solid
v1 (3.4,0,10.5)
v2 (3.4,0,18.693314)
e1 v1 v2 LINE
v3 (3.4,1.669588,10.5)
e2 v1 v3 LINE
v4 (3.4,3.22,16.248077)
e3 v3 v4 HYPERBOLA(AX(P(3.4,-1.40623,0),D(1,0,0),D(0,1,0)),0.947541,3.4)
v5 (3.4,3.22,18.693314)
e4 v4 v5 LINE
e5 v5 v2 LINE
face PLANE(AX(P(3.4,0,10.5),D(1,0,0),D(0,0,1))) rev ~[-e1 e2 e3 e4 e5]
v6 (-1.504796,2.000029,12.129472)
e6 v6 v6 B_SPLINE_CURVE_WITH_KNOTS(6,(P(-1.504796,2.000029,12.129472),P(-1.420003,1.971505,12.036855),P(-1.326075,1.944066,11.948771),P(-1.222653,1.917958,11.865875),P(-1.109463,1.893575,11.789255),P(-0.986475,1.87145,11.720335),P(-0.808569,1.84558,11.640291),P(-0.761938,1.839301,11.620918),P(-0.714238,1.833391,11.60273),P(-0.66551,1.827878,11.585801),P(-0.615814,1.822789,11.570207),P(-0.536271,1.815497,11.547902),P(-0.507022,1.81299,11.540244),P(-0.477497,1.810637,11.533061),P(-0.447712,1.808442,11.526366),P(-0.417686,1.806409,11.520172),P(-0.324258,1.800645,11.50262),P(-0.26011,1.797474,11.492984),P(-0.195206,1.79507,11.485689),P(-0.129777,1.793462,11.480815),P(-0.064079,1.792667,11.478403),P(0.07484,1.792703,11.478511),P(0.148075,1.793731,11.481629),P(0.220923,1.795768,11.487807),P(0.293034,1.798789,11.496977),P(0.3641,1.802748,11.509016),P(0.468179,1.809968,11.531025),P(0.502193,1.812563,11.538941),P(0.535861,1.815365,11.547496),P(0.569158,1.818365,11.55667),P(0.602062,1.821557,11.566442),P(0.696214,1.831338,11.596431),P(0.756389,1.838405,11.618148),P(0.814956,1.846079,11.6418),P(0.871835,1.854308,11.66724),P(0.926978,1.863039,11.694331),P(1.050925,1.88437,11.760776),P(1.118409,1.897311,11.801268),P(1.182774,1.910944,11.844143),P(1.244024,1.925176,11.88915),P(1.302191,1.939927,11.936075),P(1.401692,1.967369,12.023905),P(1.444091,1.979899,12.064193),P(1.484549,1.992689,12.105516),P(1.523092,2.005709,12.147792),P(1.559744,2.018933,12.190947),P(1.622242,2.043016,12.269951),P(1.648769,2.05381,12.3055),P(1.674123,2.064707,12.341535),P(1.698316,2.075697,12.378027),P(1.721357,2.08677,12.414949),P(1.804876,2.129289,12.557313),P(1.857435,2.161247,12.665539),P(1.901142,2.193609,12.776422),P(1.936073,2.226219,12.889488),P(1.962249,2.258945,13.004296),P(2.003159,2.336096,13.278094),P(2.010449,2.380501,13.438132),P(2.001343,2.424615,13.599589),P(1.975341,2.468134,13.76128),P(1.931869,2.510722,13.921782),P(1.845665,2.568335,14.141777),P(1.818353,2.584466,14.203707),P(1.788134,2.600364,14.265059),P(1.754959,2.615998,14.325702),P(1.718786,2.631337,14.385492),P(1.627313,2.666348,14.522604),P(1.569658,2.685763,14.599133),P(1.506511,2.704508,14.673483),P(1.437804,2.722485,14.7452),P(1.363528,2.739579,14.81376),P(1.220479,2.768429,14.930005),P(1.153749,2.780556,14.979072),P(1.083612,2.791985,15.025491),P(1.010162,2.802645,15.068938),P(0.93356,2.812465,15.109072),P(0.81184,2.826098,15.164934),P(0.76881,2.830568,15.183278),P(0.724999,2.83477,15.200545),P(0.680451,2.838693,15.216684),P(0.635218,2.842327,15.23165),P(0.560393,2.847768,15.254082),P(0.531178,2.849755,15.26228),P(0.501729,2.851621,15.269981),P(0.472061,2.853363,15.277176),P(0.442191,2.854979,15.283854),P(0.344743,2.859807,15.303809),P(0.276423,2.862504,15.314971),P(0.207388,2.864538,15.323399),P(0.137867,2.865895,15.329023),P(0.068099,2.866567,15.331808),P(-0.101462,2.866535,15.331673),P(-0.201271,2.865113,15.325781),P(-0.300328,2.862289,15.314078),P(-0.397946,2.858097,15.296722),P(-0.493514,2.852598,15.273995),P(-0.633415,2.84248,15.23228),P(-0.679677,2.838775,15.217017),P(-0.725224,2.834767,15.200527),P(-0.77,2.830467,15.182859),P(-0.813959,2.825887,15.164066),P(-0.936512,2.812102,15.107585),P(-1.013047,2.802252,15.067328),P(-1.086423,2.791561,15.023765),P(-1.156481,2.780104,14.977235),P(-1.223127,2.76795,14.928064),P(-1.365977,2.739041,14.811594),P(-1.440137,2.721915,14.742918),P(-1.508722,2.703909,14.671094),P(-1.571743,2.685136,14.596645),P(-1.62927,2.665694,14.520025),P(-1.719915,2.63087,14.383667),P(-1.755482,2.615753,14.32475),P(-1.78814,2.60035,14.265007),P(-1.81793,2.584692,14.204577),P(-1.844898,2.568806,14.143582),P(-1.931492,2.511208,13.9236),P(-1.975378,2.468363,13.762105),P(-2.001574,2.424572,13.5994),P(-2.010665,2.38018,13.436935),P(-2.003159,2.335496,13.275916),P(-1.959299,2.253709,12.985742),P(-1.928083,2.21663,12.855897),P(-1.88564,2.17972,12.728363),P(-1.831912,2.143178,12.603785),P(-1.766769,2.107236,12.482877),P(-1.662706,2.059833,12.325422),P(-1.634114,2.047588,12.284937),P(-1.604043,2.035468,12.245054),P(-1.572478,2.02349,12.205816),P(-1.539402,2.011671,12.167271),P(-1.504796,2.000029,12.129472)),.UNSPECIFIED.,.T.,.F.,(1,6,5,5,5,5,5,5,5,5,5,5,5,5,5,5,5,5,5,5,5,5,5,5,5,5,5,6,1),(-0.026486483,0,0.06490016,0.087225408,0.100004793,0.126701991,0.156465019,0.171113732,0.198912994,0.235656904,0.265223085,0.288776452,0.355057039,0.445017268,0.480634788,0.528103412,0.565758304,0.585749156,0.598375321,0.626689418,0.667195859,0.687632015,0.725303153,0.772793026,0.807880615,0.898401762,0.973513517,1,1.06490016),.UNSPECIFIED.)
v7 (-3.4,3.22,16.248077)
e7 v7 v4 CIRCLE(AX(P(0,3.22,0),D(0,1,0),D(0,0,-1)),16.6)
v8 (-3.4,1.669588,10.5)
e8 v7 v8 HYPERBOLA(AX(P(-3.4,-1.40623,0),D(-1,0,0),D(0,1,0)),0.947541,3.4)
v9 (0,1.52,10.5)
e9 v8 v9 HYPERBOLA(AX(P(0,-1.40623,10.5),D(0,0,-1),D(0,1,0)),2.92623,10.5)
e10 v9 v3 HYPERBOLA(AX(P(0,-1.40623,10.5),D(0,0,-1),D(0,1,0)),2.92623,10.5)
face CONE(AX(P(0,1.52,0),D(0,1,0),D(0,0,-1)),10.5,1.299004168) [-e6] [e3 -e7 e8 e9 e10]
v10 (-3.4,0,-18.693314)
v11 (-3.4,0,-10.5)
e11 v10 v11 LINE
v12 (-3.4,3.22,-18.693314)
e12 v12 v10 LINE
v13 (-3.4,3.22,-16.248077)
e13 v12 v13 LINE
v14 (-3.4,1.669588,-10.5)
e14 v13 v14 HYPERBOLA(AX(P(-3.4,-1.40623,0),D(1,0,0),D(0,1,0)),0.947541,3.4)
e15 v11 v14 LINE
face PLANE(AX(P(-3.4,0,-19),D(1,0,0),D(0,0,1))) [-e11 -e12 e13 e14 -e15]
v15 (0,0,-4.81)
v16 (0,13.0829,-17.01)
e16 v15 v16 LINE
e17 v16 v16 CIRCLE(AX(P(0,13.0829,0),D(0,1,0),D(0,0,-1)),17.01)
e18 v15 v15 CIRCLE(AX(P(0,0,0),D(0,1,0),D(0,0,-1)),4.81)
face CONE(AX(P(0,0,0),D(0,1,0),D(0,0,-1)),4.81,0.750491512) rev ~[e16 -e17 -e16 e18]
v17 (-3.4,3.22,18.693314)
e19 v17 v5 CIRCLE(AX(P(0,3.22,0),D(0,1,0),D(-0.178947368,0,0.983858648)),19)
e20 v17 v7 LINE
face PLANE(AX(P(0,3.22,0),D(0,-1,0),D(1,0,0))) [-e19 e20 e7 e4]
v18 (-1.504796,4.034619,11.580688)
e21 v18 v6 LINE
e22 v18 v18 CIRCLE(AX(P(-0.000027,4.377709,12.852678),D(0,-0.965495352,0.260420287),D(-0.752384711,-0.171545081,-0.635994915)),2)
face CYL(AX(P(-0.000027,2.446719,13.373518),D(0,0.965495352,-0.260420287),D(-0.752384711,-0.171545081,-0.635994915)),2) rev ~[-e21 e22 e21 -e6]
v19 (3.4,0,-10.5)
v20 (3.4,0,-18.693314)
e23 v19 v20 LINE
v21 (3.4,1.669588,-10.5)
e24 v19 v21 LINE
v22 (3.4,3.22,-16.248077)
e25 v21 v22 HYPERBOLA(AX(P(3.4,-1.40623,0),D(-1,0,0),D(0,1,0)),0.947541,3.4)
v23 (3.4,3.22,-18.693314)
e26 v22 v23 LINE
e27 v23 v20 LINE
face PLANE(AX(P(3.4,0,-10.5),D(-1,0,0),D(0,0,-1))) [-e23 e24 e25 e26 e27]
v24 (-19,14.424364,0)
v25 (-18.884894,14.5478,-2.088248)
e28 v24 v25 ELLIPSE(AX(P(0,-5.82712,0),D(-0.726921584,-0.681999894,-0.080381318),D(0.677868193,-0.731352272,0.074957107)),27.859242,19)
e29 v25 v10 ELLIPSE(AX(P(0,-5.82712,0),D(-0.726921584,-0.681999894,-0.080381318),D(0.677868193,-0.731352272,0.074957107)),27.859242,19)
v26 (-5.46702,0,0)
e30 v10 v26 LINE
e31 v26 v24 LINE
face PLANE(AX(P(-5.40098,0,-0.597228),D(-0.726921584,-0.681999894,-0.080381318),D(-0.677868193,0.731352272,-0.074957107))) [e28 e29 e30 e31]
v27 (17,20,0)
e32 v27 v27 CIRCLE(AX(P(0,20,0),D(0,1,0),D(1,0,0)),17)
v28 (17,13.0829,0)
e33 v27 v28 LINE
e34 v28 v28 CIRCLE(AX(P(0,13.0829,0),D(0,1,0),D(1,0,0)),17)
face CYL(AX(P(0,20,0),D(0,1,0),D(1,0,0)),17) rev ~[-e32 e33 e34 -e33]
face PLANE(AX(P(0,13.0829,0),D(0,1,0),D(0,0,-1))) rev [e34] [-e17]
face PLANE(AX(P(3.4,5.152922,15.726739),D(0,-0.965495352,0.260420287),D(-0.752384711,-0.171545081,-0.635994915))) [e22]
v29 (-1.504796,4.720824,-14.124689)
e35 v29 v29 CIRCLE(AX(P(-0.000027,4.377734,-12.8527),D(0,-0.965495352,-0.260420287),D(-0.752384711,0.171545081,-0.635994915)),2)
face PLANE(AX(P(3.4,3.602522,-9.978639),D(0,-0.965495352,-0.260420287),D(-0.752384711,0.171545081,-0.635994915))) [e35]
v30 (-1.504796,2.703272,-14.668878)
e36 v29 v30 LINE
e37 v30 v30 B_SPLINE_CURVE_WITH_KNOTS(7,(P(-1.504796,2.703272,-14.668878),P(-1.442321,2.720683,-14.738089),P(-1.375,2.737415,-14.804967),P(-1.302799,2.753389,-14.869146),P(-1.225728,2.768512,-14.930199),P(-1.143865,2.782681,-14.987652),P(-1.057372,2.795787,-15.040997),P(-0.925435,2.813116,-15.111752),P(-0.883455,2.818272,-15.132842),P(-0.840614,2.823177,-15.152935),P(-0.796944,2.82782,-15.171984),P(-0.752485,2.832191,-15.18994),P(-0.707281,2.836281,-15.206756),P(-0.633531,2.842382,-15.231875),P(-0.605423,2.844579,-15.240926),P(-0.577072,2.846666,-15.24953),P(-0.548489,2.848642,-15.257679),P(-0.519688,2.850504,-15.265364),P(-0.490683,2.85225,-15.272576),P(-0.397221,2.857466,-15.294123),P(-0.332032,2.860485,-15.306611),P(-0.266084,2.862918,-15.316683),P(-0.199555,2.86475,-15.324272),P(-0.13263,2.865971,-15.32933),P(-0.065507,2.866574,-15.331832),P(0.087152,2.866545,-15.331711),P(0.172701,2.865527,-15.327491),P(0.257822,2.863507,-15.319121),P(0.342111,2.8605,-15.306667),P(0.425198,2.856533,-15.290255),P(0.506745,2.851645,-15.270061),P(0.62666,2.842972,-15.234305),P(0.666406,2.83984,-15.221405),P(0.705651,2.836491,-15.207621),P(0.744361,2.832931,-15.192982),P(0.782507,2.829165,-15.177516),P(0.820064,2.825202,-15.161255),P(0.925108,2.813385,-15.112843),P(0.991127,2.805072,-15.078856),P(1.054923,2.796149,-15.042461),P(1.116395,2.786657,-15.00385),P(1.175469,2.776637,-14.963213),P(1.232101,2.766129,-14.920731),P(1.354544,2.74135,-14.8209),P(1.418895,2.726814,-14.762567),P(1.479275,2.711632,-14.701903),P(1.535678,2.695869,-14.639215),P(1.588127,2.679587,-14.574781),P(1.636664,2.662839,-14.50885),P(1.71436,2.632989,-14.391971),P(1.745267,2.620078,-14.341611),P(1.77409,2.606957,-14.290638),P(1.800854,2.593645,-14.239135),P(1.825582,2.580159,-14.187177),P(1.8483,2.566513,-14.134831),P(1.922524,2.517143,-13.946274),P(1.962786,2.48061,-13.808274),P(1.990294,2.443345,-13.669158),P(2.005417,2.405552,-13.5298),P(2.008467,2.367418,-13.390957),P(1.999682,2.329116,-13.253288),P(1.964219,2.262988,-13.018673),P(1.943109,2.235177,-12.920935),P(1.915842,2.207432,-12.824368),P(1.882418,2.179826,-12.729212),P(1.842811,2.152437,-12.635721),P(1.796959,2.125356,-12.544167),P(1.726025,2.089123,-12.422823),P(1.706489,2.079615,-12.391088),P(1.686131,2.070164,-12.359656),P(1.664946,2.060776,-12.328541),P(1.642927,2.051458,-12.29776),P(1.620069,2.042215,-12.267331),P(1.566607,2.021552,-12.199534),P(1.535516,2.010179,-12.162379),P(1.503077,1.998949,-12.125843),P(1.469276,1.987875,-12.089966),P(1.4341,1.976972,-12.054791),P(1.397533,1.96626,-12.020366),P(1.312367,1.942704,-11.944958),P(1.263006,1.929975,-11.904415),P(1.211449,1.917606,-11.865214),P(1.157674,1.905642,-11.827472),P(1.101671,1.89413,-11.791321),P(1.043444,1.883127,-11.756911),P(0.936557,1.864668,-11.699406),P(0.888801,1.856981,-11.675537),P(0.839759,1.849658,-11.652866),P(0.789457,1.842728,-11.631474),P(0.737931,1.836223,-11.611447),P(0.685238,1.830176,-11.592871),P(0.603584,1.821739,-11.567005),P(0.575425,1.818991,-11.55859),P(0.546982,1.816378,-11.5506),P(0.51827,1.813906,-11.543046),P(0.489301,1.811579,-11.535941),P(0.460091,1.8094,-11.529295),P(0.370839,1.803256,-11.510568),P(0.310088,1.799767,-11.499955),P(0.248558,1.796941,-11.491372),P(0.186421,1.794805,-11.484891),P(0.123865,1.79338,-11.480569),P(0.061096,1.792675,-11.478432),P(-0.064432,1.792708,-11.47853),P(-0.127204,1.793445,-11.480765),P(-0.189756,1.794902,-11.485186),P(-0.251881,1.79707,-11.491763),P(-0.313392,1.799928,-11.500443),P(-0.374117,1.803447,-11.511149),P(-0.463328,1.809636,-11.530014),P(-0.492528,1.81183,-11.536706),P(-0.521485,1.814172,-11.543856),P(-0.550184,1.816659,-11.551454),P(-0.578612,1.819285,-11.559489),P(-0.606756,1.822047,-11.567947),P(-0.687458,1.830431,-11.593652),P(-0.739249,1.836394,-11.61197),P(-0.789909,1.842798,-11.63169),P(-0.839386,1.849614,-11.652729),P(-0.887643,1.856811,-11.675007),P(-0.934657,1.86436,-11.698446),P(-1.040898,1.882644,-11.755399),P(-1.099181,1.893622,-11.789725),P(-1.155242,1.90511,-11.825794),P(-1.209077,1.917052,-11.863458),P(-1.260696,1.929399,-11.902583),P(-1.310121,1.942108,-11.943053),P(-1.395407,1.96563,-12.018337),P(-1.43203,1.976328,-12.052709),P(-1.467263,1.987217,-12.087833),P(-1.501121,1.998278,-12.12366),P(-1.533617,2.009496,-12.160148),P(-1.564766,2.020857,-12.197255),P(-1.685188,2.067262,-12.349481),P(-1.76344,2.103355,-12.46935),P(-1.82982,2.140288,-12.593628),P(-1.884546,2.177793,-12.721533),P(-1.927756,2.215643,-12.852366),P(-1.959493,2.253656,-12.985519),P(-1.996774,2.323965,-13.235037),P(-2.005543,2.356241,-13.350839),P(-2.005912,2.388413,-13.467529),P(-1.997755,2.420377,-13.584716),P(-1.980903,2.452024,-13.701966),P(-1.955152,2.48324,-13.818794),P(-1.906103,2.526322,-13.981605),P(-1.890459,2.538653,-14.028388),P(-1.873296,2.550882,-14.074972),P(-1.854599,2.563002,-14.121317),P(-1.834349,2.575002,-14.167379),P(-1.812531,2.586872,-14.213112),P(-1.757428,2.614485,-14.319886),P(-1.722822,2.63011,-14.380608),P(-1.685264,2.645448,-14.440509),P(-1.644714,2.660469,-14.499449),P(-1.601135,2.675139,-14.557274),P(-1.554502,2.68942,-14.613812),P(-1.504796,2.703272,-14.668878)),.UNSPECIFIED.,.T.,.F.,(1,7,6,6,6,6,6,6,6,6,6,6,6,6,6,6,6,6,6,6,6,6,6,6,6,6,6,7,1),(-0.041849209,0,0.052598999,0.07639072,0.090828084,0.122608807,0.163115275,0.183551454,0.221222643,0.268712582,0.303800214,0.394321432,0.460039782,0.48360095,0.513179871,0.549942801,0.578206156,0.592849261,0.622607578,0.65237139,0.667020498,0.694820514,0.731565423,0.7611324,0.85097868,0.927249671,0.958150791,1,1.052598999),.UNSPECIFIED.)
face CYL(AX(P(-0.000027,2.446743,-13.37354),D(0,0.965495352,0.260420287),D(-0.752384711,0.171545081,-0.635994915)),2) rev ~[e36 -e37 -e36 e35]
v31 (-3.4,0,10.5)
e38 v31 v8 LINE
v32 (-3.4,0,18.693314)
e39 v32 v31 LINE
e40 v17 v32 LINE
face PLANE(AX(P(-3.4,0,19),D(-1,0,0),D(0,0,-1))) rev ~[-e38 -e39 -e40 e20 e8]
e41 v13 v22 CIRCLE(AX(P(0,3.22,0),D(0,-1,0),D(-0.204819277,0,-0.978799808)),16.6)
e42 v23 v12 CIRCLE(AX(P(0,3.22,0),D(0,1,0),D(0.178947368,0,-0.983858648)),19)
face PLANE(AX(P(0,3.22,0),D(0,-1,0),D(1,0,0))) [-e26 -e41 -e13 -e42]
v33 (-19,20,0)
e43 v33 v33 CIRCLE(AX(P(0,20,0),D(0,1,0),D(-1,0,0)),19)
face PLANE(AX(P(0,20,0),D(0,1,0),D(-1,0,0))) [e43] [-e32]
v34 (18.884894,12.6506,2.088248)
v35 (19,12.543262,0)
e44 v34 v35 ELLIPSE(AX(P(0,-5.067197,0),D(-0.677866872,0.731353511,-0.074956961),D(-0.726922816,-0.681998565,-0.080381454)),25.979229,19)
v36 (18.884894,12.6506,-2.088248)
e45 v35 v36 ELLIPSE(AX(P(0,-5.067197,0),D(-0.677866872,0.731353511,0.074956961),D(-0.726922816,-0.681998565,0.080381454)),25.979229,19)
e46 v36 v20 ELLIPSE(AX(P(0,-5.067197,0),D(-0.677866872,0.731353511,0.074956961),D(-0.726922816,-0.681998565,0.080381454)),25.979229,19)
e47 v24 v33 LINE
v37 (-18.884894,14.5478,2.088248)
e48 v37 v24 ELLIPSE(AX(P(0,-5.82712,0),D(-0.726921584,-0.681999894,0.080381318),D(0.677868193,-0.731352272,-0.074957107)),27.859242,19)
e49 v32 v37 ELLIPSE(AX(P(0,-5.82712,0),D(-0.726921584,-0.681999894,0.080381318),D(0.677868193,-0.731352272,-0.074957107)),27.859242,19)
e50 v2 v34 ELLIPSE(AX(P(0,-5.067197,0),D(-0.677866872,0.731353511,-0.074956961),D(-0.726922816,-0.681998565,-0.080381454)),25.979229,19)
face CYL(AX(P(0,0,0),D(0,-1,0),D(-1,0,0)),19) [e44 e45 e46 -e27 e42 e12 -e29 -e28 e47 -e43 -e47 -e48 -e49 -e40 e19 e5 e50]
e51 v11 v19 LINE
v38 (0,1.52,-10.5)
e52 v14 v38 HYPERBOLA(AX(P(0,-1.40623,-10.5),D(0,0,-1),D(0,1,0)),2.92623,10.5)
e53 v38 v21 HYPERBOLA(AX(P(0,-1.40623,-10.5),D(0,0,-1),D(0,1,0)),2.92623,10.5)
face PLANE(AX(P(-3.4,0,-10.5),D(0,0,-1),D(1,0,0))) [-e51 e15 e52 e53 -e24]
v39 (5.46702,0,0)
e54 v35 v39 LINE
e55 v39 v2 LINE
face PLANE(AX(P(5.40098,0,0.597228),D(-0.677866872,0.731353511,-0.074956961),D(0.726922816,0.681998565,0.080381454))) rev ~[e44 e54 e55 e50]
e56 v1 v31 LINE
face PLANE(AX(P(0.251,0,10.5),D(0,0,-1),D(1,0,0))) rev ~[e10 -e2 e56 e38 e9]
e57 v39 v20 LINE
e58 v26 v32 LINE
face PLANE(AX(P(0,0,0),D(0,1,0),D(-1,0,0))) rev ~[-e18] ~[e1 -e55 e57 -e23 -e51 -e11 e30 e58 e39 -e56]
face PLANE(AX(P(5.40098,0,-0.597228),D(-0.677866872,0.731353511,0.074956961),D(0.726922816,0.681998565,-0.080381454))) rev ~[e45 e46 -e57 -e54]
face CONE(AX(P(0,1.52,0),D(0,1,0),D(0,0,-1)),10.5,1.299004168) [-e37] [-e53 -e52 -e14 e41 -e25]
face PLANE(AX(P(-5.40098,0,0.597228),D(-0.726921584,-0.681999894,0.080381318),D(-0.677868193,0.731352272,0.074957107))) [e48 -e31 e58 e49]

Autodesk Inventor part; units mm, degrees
ref_plane "YZ Plane" through (0, 0, 0) normal (1, 0, 0) x (0, 1, 0)
sketch "Sketch1" plane through (0, 0, 0) normal (0, 1, 0) x (-1, 0, 0)
  circle A0 centre (0, 0) radius 19
  dimension "d0" = 38
extrude "Extrusion1" add sketch "Sketch1" along normal blind 20
sketch "Sketch2" plane through (0, 0, 0) normal (0, -1, 0) x (1, 0, 0)
  line L0 (0, -10.5) -> (3.4, -10.5)
  line L1 (3.4, -10.5) -> (3.4, -19)
  line L2 (3.4, -19) -> (0, -19)
  line L3 (0, -19) -> (-3.4, -19)
  line L4 (-3.4, -19) -> (-3.4, -10.5)
  line L5 (-3.4, -10.5) -> (0, -10.5)
  point P0 (0, 0)
  dimension "d3" = 10.5
  dimension "d5" = 8.5
  dimension "d113" = 3.4
  dimension "d114" = 3.4
sketch "Sketch3" plane through (0, 0, 0) normal (0, -1, 0) x (1, 0, 0)
  line L0 (0.251, 10.5) -> (3.4, 10.5)
  line L1 (3.4, 10.5) -> (3.4, 19)
  line L2 (3.4, 19) -> (-0.351, 19)
  line L3 (-0.351, 19) -> (-3.4, 19)
  line L4 (-3.4, 19) -> (-3.4, 10.5)
  line L5 (-3.4, 10.5) -> (0.251, 10.5)
  point P0 (0, 0)
  dimension "d22" = 8.5
  dimension "d106" = 10.5
  dimension "d107" = 3.4
  dimension "d110" = 3.4
extrude "Extrusion2" cut sketch "Sketch3" against normal blind 3.22
extrude "Extrusion3" cut sketch "Sketch2" against normal blind 3.22
sketch "Sketch4" plane through (0, 0, 0) normal (1, 0, 0) x (0, 1, 0)
  line L0 (0, -10.5) -> (3.22, -10.5) projected
  line L1 (3.22, -10.5) -> (3.22, -16.6)
  line L2 (3.22, -10.5) -> (3.22, -18.6933) projected
  line L3 (3.22, -16.6) -> (3.22, -10.5)
  line L4 (3.22, -10.5) -> (1.52, -10.5)
  line L5 (1.52, -10.5) -> (3.22, -16.6)
  line L6 (-0.644, 0) -> (3.864, 0) projected
  point P0 (0, 0)
  dimension "d28" = 6.1
  dimension "d29" = 1.7
revolve "Revolution1" add sketch "Sketch4" angle 360 about axis through (0, -10, 0) along (0, 1, 0)
sketch "Sketch5" plane through (0, 20, 0) normal (0, 1, 0) x (1, 0, 0)
  circle A0 centre (0, 0) radius 4.81
  dimension "d31" = 9.62
extrude "Extrusion4" cut sketch "Sketch5" against normal through all
sketch "Sketch6" plane through (0, 0, 0) normal (1, 0, 0) x (0, 1, 0)
  line L0 (0, -4.81) -> (13.0829, -17.01)
  line L1 (20, -19) -> (20, 19) projected
  line L2 (13.0829, -4.81) -> (0, -4.81)
  line L3 (-2.6166, 0) -> (15.6995, 0) projected
  line L4 (13.0829, -4.81) -> (13.0829, -17.01)
  line L5 (3.22, -19) -> (20, -19) projected
  line L6 (0, -4.81) -> (13.0829, -4.81) construction
  point P0 (0, 0)
  point P1 (20, -4.81)
  point P2 (13.0829, -17.01)
  dimension "d85" = 12.2
  dimension "d90" = 13.0829
revolve "Revolution2" cut sketch "Sketch6" angle 360 about axis through (0, -10, 0) along (0, 1, 0)
ref_plane "Work Plane1" through (3.4, 3.22, 16.2481) normal (0, -0.9654954, 0.2604203) x (-0.7523847, -0.1715451, -0.6359949)
sketch "Sketch10" plane through (3.4, 3.22, 16.2481) normal (0, -0.9654954, 0.2604203) x (-0.7523847, -0.1715451, -0.6359949)
  line L0 (9.3243, 0.3271) -> (9.0379, 0) projected
  line L1 (-1.5552, -1.7763) -> (0, 0) projected
  line L2 (9.0379, 0) -> (0, 0)
  circle A0 centre (4.519, 0) radius 2
  point P0 (13.4442, 10.1942)
  dimension "d111" = 4
extrude "Extrusion5" cut sketch "Sketch10" along normal mid plane 4
ref_plane "Work Plane4" through (3.4, 1.6696, -10.5) normal (0, -0.9654954, -0.2604203) x (-0.7523847, 0.1715451, -0.6359949)
sketch "Sketch12" plane through (3.4, 1.6696, -10.5) normal (0, -0.9654954, -0.2604203) x (-0.7523847, 0.1715451, -0.6359949)
  line L0 (-0.2864, -0.3271) -> (0, 0) projected
  ellipse E0 centre (-3.8539, -9.5633) end of major axis (8.6357, -20.4981) minor radius 16.0272 (9.0379, 0) -> (3.9217, 4.4793) ccw projected
  line L1 (0, 0) -> (3.9217, 4.4793)
  line L2 (4.8298, -4.8065) -> (5.1162, -4.4793) projected
  line L3 (5.1162, -4.4793) -> (3.9217, 4.4793)
  line L4 (10.5931, 1.7763) -> (9.0379, 0) projected
  line L5 (9.0379, 0) -> (0, 0)
  circle A0 centre (4.519, 0) radius 2
  point P0 (-4.4062, -10.1942)
  point P1 (4.519, 0)
  dimension "d116" = 4
extrude "Extrusion6" cut sketch "Sketch12" along normal mid plane 4 contours A0 L3 L5 | L5 L3 A0 | L3 L5 A0 | L3 A0 L5
sketch "Sketch18" plane through (0, 0, 0) normal (0.1099078, 0, 0.9939418) x (0.9939418, 0, -0.1099078)
  line L0 (19, 20) -> (-19, 20) projected
  line L1 (19, 0) -> (5.4339, 0)
  line L2 (4.5334, 0) -> (5.4339, 0) projected
  line L3 (5.4339, 0) -> (19, 12.6506)
  line L4 (19, 0) -> (19, 20) projected
  line L5 (5.4339, 0) -> (23.9832, 0) construction
  line L6 (1.3249, 0) -> (19, 0) projected
  line L7 (19, 12.6506) -> (19, 0)
  line L8 (19, 0) -> (19, 20) projected
  line L9 (19, 0) -> (5.4339, 0)
  point P0 (0, 0)
  point P1 (24.4257, 20)
  dimension "d91" = 43
sketch "Sketch20" plane through (0, 0, 0) normal (-0.1099078, 0, 0.9939418) x (0.9939418, 0, 0.1099078)
  line L0 (5.4339, 3.22) -> (5.4339, 0) projected
  line L1 (5.4339, 0) -> (19, 12.6506)
  line L2 (19, 0) -> (19, 20) projected
  line L3 (5.4339, 0) -> (23.9832, 0) construction
  line L4 (1.3249, 0) -> (19, 0) projected
  line L5 (19, 12.6506) -> (19, 0)
  line L6 (5.4339, 0) -> (4.5334, 0) projected
  line L7 (19, 0) -> (5.4339, 0)
  point P0 (0, 0)
  point P1 (10.438, 5)
  point P2 (-18.8849, 20)
  point P3 (-18.8849, 20)
  dimension "d94" = 43
sketch "Sketch21" plane through (0, 0, 0) normal (-0.1099078, 0, 0.9939418) x (0.9939418, 0, 0.1099078)
  point P0 (0, 0)
sketch "Sketch22" plane through (0, 0, 0) normal (-0.1099078, 0, 0.9939418) x (0.9939418, 0, 0.1099078)
  line L0 (-18.8849, 20) -> (-19, 20) projected
  line L1 (-5.4339, 0) -> (21.9126, 0) construction
  line L2 (-5.4339, 0) -> (-4.5334, 0) projected
  line L3 (-5.4339, 0) -> (-19, 14.5478)
  line L4 (-19, 0) -> (-19, 20) projected
  line L5 (-5.4339, 0) -> (14.4577, 0) construction
  line L6 (-19, 0) -> (-1.3249, 0) projected
  line L7 (-19, 14.5478) -> (-19, 0)
  line L8 (-19, 0) -> (-5.4339, 0)
  point P0 (0, 0)
  dimension "d97" = 133
sketch "Sketch23" plane through (0, 0, 0) normal (0.1099078, 0, 0.9939418) x (0.9939418, 0, -0.1099078)
  line L0 (-9.5907, 0) -> (-1.3249, 0) projected
  line L1 (-5.6359, 0) -> (1.2007, 0) construction
  line L2 (-4.5334, 0) -> (-5.4339, 0) projected
  line L3 (-5.4339, 0) -> (-19, 14.5478)
  line L4 (-19, 0) -> (-19, 20) projected
  line L5 (-5.4339, 0) -> (14.4577, 0) construction
  line L6 (-19, 0) -> (-1.3249, 0) projected
  line L7 (-19, 14.5478) -> (-19, 0)
  line L8 (-19, 0) -> (-5.4339, 0)
  point P0 (0, 0)
  point P1 (-18.8849, 20)
  point P2 (-18.8849, 20)
  dimension "d100" = 133
extrude "Extrusion13" cut sketch "Sketch18" along normal through all both and the other way through all
extrude "Extrusion14" cut sketch "Sketch20" along normal through all both and the other way through all
extrude "Extrusion15" cut sketch "Sketch22" along normal through all both and the other way through all
extrude "Extrusion16" cut sketch "Sketch23" along normal through all both and the other way through all
sketch "Sketch25" plane through (0, 20, 0) normal (0, 1, 0) x (1, 0, 0)
  circle A0 centre (0, 0) radius 17
  dimension "d103" = 34
extrude "Extrusion17" cut sketch "Sketch25" against normal blind 6.92
properties part number "LightShieldBottom" material "Glass"
